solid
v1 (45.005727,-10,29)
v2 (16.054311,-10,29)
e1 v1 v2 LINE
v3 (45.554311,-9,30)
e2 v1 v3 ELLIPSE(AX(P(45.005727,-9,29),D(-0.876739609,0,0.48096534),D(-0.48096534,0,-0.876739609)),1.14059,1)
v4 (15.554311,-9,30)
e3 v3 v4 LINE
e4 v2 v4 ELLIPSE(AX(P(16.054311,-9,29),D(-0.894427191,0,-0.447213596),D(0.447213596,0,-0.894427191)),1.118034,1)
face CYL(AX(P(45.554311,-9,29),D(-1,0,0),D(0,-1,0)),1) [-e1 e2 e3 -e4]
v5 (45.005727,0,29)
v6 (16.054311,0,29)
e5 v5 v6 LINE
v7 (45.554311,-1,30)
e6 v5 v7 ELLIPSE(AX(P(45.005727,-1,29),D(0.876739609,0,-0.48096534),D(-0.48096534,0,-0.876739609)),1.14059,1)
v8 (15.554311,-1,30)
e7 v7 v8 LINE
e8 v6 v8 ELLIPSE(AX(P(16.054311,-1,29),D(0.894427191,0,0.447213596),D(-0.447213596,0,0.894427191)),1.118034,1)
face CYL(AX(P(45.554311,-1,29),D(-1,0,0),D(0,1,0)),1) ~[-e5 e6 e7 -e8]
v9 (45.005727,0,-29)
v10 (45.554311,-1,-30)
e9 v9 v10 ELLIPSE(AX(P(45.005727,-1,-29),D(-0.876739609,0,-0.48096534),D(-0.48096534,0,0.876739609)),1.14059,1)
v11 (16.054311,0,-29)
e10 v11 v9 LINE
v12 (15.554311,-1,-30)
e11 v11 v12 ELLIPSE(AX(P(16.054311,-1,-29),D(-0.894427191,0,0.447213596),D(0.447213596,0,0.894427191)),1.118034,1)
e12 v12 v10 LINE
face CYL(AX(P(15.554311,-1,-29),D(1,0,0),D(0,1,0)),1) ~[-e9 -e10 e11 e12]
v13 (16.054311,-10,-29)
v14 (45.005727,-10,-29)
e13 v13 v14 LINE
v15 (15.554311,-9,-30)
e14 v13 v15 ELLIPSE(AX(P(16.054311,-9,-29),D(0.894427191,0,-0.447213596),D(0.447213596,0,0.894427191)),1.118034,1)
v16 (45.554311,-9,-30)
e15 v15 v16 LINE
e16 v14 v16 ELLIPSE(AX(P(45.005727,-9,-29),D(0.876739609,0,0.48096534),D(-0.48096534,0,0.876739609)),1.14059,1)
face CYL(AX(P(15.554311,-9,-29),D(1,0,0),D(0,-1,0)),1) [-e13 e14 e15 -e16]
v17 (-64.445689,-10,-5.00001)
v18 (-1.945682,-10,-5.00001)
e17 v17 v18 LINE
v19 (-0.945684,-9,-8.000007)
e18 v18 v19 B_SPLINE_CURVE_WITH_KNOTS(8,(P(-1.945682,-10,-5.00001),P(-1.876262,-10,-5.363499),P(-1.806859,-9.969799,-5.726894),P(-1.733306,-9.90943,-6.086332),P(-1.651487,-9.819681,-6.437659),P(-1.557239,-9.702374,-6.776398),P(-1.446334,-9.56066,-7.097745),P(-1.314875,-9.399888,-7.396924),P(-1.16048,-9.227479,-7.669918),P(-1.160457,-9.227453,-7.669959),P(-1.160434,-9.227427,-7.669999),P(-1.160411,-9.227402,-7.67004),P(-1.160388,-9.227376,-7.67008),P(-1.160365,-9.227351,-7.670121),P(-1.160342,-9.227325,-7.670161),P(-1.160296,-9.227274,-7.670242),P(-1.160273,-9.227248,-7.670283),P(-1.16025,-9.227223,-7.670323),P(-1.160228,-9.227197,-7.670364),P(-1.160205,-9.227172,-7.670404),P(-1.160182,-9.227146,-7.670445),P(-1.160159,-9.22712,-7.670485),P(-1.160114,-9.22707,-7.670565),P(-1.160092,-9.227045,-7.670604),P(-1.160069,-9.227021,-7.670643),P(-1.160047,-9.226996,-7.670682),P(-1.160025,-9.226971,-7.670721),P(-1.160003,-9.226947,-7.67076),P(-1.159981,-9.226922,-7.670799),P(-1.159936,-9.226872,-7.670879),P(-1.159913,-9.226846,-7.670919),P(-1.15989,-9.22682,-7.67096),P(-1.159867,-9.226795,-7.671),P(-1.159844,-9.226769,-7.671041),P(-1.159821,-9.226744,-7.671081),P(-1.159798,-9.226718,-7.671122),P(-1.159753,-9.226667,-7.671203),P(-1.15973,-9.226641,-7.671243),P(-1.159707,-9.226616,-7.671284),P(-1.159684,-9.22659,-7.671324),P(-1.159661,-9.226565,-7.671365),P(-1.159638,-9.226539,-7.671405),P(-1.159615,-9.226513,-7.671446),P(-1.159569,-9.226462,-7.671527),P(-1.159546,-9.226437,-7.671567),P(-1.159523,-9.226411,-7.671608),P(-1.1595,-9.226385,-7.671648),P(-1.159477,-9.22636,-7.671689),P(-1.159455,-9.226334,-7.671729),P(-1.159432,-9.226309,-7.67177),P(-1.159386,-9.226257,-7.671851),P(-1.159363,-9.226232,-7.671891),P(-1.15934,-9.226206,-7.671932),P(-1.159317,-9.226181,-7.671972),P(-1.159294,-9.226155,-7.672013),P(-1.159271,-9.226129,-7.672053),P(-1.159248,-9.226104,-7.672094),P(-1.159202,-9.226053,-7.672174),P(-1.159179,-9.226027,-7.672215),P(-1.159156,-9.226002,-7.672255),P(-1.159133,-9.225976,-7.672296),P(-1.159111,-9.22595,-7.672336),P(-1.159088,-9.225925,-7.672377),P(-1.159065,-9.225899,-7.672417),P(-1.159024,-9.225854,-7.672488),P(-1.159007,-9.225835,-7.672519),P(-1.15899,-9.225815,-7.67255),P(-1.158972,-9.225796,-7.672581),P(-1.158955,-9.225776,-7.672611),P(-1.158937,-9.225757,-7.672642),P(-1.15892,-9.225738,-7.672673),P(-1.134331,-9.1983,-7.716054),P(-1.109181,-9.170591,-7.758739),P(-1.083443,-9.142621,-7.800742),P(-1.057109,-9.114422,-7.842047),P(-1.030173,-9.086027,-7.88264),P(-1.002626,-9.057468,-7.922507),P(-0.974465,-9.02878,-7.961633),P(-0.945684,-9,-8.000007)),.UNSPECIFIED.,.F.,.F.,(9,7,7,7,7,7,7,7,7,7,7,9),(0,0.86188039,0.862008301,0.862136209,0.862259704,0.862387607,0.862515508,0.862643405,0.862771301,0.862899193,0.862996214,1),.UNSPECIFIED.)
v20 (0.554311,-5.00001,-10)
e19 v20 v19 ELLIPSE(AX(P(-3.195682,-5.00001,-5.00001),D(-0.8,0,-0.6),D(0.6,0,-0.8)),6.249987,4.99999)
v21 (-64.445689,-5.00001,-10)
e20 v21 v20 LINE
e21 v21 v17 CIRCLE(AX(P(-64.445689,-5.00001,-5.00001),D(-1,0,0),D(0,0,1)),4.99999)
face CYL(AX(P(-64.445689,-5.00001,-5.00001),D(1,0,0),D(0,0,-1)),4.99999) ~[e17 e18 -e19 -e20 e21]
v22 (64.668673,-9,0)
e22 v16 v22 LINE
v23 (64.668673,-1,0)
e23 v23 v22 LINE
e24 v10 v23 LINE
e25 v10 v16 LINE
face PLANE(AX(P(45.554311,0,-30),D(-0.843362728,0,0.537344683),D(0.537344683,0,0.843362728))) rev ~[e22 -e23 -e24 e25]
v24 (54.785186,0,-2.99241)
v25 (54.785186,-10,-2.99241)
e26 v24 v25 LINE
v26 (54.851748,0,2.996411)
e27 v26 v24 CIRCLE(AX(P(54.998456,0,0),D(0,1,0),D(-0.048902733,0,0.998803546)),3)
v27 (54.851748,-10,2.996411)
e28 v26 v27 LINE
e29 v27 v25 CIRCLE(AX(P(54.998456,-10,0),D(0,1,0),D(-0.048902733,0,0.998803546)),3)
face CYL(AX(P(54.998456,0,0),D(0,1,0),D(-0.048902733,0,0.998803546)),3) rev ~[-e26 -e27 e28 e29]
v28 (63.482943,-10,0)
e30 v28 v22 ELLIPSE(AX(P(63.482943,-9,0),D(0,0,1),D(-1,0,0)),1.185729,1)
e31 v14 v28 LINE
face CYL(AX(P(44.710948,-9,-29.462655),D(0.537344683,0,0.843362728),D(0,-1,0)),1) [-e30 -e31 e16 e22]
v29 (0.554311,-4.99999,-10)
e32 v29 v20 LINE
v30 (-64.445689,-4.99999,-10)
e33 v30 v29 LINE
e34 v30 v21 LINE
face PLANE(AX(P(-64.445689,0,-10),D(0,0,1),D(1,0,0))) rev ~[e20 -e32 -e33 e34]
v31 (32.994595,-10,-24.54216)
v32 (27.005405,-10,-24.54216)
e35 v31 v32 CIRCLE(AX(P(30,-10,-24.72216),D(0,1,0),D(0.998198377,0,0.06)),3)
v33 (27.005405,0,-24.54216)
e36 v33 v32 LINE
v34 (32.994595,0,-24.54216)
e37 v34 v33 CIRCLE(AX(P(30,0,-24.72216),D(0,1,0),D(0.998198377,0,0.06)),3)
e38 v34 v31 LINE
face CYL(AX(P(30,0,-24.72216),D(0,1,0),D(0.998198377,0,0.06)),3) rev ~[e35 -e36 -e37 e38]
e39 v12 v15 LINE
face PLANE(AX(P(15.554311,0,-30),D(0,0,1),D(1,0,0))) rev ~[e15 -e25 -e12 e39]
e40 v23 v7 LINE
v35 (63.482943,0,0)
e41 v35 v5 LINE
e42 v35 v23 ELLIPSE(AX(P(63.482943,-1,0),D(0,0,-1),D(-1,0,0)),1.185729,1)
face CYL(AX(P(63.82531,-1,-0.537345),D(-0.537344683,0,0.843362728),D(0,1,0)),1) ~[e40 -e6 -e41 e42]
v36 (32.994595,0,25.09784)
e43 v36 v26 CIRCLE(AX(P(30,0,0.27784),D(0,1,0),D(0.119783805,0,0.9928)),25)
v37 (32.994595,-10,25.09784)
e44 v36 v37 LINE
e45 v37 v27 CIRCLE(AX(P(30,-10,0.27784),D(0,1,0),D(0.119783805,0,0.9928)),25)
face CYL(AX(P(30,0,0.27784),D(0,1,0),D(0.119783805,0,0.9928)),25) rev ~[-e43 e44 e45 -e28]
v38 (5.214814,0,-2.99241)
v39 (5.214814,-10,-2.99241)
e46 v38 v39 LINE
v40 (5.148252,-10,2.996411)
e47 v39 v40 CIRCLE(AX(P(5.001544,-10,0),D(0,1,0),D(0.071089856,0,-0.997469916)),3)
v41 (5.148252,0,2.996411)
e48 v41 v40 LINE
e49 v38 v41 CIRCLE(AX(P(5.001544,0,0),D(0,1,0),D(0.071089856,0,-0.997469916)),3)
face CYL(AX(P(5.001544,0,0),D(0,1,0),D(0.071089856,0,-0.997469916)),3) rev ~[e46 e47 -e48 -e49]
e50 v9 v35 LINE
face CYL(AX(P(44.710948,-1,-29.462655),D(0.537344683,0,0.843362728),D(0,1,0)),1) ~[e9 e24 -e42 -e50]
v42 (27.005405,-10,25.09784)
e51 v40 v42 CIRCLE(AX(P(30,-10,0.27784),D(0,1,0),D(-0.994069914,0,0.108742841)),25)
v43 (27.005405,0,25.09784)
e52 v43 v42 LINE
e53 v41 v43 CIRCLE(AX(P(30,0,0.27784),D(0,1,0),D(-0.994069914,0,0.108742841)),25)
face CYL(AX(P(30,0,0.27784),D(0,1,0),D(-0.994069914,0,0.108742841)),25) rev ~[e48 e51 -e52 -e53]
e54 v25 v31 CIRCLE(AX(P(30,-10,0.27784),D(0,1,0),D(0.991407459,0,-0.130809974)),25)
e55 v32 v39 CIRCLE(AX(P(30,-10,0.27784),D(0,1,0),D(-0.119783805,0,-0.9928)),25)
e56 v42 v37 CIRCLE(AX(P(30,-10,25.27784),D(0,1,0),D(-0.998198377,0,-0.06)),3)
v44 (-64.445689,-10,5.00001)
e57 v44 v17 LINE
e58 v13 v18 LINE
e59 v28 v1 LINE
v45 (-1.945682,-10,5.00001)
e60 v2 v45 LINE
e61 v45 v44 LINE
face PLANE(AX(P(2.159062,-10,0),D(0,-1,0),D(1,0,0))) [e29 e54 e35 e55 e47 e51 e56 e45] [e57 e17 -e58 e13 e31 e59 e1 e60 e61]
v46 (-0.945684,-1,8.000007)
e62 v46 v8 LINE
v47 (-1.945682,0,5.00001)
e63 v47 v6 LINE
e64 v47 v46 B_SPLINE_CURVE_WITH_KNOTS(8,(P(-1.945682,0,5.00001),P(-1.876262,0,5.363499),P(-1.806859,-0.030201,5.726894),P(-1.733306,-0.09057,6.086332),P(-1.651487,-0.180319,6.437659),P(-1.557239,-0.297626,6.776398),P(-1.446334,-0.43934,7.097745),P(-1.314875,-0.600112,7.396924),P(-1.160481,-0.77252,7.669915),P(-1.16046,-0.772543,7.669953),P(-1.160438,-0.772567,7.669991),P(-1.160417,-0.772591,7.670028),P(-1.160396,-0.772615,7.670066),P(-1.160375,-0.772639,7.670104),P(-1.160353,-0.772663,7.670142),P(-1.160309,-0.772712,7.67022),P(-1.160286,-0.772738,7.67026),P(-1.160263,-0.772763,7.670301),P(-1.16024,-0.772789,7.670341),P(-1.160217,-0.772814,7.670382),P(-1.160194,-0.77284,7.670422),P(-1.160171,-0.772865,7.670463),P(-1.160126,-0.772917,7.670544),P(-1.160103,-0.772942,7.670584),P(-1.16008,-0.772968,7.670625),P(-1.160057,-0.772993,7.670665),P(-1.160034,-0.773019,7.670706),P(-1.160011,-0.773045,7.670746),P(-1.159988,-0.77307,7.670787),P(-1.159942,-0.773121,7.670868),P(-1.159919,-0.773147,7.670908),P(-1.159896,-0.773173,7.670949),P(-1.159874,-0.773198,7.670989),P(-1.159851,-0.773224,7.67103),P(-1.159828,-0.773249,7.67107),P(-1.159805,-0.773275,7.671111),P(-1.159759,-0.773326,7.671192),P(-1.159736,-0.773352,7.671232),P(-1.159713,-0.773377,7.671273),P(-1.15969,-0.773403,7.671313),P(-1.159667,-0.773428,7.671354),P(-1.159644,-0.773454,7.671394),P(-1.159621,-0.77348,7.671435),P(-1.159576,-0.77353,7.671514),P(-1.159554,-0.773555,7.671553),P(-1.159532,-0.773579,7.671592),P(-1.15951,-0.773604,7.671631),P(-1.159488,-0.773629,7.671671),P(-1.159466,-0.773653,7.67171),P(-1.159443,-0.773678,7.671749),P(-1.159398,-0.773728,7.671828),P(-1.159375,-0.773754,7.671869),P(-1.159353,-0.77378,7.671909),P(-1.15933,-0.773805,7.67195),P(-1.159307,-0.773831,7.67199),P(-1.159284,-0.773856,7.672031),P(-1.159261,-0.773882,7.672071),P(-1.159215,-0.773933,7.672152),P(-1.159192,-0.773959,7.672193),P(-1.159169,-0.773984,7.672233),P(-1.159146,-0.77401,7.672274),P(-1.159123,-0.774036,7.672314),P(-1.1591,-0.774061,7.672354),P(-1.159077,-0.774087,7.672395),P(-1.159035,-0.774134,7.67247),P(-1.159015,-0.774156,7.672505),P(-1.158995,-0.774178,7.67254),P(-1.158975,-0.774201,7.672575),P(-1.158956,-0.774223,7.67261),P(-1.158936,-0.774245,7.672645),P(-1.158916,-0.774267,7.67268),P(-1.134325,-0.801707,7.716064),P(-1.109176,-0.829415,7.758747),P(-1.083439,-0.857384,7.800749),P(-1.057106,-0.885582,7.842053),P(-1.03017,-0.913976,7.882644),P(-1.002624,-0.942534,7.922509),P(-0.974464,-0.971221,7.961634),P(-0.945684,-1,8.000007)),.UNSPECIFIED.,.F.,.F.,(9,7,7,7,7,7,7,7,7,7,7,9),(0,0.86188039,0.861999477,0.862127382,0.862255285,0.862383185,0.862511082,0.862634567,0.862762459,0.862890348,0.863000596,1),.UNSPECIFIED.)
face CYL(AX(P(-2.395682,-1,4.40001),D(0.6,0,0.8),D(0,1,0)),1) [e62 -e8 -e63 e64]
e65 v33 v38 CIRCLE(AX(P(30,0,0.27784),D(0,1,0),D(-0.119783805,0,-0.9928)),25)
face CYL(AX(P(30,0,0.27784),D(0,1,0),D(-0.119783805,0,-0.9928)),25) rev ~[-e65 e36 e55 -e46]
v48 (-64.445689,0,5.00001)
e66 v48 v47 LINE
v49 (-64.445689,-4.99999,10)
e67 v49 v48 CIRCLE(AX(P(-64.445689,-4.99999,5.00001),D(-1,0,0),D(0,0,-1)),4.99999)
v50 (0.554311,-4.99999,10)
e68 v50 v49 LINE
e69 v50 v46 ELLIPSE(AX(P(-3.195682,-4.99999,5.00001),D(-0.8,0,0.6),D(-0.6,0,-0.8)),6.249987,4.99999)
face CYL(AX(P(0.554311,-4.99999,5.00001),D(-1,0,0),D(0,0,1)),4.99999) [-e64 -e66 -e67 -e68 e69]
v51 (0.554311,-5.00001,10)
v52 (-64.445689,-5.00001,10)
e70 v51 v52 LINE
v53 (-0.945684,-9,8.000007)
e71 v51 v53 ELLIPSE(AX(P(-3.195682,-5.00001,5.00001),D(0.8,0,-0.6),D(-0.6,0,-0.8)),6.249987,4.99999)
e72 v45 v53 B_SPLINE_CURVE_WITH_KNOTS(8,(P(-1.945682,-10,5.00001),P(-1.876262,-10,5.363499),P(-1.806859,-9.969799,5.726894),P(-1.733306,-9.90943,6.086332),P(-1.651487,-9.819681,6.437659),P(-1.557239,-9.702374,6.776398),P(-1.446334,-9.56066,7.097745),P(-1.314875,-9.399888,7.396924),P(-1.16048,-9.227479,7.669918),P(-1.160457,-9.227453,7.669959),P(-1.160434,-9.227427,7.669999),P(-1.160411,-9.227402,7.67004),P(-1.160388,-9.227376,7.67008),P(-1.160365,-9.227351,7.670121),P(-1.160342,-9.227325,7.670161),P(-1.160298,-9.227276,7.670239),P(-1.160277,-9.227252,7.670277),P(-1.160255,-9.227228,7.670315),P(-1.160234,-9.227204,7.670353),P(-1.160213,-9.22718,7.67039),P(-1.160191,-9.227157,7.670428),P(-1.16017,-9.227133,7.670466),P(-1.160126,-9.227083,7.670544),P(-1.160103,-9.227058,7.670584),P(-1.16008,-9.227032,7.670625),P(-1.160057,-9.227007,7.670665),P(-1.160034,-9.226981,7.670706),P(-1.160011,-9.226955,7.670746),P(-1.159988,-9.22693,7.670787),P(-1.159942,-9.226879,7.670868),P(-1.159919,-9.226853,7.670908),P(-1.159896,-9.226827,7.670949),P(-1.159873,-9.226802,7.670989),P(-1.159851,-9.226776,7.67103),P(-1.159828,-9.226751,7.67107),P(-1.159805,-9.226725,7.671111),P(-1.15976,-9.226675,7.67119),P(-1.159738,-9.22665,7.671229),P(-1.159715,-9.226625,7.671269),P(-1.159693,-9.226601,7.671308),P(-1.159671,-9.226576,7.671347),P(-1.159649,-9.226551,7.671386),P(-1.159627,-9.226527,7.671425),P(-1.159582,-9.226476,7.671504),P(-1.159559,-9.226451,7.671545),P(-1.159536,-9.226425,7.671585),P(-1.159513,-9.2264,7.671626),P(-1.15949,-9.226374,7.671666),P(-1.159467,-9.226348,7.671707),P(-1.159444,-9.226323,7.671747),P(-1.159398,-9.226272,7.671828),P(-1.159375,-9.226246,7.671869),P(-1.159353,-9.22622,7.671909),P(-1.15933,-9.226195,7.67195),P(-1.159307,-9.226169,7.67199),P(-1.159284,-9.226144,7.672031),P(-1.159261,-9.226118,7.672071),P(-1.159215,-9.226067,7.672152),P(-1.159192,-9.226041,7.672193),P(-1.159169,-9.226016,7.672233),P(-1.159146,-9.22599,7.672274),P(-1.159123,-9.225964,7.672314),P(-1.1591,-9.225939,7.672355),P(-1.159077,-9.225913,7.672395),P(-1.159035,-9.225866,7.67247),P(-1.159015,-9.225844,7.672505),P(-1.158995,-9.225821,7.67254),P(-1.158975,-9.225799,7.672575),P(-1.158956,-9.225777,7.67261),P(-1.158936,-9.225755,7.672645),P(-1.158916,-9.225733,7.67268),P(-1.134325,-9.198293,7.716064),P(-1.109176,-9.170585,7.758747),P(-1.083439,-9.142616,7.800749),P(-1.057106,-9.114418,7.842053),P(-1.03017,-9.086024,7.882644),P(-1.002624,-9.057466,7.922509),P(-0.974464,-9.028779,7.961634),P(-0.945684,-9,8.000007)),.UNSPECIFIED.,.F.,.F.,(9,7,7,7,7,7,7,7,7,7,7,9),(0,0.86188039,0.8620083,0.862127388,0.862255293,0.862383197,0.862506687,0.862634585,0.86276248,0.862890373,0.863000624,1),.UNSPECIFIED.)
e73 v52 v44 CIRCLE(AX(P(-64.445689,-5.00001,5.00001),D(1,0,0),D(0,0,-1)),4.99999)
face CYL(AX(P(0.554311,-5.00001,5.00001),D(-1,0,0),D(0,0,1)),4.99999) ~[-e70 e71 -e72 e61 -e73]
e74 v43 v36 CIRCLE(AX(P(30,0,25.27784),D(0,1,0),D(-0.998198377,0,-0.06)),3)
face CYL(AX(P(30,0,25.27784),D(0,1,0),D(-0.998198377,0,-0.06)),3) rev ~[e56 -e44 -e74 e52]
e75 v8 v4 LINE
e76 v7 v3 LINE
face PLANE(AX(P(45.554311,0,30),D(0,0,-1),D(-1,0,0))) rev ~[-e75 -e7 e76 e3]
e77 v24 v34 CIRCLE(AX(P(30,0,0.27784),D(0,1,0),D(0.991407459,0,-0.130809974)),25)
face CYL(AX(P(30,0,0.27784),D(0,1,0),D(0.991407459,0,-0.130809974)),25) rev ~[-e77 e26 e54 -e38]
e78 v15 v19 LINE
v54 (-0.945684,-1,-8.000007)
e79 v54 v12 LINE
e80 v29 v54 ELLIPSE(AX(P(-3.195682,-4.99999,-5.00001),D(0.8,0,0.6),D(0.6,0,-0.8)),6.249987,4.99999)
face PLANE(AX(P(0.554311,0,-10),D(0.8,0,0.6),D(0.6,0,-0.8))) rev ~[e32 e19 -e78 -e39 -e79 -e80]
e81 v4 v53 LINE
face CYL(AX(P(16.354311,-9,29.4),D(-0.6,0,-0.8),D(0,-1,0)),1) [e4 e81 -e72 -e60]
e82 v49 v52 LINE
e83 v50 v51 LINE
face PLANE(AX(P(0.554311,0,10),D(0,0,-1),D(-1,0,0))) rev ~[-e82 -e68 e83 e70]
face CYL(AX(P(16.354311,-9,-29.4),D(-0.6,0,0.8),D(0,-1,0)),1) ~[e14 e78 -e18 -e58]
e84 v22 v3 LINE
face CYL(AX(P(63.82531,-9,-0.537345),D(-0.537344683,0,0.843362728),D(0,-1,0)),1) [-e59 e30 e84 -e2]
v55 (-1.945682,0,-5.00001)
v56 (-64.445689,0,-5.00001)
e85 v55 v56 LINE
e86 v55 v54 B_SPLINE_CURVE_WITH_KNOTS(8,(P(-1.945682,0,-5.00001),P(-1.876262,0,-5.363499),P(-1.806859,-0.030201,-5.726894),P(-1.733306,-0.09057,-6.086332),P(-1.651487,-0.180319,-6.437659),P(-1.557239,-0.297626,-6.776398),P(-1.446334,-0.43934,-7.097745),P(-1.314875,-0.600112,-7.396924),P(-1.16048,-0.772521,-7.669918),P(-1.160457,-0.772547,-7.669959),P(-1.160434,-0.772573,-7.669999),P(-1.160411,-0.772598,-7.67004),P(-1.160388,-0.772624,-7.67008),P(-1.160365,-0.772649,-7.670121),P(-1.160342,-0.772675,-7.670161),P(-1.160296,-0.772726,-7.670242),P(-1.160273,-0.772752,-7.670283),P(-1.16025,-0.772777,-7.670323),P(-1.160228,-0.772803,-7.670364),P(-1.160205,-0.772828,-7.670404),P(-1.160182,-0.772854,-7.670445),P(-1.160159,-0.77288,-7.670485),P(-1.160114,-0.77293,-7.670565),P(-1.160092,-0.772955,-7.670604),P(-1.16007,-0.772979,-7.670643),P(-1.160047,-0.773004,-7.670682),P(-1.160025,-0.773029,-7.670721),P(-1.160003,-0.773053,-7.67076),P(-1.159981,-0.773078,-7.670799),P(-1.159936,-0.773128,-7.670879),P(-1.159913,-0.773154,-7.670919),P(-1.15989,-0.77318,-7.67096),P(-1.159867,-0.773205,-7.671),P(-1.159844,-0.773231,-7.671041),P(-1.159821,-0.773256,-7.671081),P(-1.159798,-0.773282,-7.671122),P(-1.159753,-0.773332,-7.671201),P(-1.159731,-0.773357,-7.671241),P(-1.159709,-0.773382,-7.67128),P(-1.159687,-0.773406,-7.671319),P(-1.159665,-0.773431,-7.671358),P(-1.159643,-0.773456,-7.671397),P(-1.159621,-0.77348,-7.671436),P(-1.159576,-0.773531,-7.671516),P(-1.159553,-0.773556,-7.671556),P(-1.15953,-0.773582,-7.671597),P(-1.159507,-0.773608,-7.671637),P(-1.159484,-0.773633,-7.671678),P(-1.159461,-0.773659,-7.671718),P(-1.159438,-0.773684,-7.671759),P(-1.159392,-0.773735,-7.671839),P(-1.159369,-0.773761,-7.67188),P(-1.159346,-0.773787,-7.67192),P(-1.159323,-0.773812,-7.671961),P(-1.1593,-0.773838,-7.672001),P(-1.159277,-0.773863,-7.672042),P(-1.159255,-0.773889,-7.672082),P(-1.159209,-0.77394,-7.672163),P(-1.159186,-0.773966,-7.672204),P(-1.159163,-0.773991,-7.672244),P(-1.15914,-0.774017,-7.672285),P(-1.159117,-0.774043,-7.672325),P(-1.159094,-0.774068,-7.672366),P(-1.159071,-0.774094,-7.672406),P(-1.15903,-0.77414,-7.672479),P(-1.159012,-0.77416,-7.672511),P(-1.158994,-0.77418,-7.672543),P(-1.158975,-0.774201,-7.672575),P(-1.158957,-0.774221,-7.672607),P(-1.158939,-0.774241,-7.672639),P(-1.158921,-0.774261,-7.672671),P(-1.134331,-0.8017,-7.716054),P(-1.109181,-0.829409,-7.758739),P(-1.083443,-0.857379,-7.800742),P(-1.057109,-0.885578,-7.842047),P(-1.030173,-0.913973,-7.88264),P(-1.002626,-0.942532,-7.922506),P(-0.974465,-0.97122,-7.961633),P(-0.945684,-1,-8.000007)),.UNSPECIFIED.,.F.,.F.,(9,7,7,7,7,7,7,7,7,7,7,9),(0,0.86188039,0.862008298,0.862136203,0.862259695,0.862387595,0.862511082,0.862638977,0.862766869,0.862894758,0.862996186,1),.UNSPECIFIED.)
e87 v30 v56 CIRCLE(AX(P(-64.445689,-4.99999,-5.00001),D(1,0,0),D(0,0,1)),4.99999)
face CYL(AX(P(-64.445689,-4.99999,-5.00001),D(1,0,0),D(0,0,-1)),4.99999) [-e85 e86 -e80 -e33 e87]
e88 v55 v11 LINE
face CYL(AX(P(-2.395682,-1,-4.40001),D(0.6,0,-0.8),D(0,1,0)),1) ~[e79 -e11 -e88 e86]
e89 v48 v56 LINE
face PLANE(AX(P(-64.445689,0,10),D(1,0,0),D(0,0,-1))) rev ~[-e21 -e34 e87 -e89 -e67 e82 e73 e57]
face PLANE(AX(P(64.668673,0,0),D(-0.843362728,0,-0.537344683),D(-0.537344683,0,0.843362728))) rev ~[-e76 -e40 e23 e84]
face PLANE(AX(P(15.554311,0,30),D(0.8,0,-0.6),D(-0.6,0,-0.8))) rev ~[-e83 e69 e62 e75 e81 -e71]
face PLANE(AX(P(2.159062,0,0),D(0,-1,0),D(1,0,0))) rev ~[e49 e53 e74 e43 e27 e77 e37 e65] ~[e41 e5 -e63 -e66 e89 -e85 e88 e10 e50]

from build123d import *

# Parameters (mm, degrees)
F1_DEPTH = 10
F2_R     = 4.99999
F3_R     = 4.99999
F4_R     = 1
F5_R     = 1


# Not quite as in the source:
# - a fillet or chamfer is up to 0.001 mm smaller than in the source, because OpenCascade refuses the exact size


with BuildPart() as f1:
    # F0 (on Front) → F1 (new body)
    with BuildSketch(Plane.XZ):
        Polygon((0.5543106794, -10), (15.5543106794, -30), (45.5543106794, -30), (64.6686726809, 0), (45.5543106794, 30), (15.5543106794, 30), (0.5543106794, 10), (-64.4456893206, 10), (-64.4456893206, -10), align=None)
        with BuildLine():
            ThreePointArc((32.9945951312, 25.097839601), (47.7756292438, 17.8570035455), (54.8517478565, 2.9964106368))
            ThreePointArc((54.8517478565, 2.9964106368), (57.9982707821, -0.0333407521), (54.7851864872, -2.9924097466))
            ThreePointArc((54.7851864872, -2.9924097466), (47.5791639445, -17.4977896428), (32.9945951312, -24.542160399))
            ThreePointArc((32.9945951312, -24.542160399), (30, -27.722160399), (27.0054048688, -24.542160399))
            ThreePointArc((27.0054048688, -24.542160399), (12.4208360555, -17.4977896428), (5.2148135128, -2.9924097466))
            ThreePointArc((5.2148135128, -2.9924097466), (2.0017292179, -0.0333407521), (5.1482521435, 2.9964106368))
            ThreePointArc((5.1482521435, 2.9964106368), (12.2243707562, 17.8570035455), (27.0054048688, 25.097839601))
            ThreePointArc((27.0054048688, 25.097839601), (30, 28.277839601), (32.9945951312, 25.097839601))
        make_face(mode=Mode.SUBTRACT)
    extrude(amount=F1_DEPTH)

    # F2 (radius 5 in the source; OpenCascade refuses exactly that, so slightly less here)
    f2_edges = [f1.edges().sort_by_distance(p)[0] for p in [
        (-31.945689, -10, -10),
        (-31.945689, 0, -10),
    ]]
    fillet(f2_edges, radius=F2_R)

    # F3 (radius 5 in the source; OpenCascade refuses exactly that, so slightly less here)
    f3_edges = [f1.edges().sort_by_distance(p)[0] for p in [
        (-31.945689, 0, 10),
        (-31.945689, -10, 10),
    ]]
    fillet(f3_edges, radius=F3_R)

    # F4
    f4_edges = [f1.edges().sort_by_distance(p)[0] for p in [
        (8.054311, -10, 20),
        (30.554311, -10, 30),
        (55.111492, -10, 15),
        (55.111492, -10, -15),
        (30.554311, -10, -30),
        (8.054311, -10, -20),
    ]]
    fillet(f4_edges, radius=F4_R)

    # F5
    f5_edges = [f1.edges().sort_by_distance(p)[0] for p in [
        (30.554311, 0, 30),
        (55.111492, 0, 15),
        (55.111492, 0, -15),
        (30.554311, 0, -30),
        (8.054311, 0, -20),
        (8.054311, 0, 20),
    ]]
    fillet(f5_edges, radius=F5_R)


solid = f1.part
